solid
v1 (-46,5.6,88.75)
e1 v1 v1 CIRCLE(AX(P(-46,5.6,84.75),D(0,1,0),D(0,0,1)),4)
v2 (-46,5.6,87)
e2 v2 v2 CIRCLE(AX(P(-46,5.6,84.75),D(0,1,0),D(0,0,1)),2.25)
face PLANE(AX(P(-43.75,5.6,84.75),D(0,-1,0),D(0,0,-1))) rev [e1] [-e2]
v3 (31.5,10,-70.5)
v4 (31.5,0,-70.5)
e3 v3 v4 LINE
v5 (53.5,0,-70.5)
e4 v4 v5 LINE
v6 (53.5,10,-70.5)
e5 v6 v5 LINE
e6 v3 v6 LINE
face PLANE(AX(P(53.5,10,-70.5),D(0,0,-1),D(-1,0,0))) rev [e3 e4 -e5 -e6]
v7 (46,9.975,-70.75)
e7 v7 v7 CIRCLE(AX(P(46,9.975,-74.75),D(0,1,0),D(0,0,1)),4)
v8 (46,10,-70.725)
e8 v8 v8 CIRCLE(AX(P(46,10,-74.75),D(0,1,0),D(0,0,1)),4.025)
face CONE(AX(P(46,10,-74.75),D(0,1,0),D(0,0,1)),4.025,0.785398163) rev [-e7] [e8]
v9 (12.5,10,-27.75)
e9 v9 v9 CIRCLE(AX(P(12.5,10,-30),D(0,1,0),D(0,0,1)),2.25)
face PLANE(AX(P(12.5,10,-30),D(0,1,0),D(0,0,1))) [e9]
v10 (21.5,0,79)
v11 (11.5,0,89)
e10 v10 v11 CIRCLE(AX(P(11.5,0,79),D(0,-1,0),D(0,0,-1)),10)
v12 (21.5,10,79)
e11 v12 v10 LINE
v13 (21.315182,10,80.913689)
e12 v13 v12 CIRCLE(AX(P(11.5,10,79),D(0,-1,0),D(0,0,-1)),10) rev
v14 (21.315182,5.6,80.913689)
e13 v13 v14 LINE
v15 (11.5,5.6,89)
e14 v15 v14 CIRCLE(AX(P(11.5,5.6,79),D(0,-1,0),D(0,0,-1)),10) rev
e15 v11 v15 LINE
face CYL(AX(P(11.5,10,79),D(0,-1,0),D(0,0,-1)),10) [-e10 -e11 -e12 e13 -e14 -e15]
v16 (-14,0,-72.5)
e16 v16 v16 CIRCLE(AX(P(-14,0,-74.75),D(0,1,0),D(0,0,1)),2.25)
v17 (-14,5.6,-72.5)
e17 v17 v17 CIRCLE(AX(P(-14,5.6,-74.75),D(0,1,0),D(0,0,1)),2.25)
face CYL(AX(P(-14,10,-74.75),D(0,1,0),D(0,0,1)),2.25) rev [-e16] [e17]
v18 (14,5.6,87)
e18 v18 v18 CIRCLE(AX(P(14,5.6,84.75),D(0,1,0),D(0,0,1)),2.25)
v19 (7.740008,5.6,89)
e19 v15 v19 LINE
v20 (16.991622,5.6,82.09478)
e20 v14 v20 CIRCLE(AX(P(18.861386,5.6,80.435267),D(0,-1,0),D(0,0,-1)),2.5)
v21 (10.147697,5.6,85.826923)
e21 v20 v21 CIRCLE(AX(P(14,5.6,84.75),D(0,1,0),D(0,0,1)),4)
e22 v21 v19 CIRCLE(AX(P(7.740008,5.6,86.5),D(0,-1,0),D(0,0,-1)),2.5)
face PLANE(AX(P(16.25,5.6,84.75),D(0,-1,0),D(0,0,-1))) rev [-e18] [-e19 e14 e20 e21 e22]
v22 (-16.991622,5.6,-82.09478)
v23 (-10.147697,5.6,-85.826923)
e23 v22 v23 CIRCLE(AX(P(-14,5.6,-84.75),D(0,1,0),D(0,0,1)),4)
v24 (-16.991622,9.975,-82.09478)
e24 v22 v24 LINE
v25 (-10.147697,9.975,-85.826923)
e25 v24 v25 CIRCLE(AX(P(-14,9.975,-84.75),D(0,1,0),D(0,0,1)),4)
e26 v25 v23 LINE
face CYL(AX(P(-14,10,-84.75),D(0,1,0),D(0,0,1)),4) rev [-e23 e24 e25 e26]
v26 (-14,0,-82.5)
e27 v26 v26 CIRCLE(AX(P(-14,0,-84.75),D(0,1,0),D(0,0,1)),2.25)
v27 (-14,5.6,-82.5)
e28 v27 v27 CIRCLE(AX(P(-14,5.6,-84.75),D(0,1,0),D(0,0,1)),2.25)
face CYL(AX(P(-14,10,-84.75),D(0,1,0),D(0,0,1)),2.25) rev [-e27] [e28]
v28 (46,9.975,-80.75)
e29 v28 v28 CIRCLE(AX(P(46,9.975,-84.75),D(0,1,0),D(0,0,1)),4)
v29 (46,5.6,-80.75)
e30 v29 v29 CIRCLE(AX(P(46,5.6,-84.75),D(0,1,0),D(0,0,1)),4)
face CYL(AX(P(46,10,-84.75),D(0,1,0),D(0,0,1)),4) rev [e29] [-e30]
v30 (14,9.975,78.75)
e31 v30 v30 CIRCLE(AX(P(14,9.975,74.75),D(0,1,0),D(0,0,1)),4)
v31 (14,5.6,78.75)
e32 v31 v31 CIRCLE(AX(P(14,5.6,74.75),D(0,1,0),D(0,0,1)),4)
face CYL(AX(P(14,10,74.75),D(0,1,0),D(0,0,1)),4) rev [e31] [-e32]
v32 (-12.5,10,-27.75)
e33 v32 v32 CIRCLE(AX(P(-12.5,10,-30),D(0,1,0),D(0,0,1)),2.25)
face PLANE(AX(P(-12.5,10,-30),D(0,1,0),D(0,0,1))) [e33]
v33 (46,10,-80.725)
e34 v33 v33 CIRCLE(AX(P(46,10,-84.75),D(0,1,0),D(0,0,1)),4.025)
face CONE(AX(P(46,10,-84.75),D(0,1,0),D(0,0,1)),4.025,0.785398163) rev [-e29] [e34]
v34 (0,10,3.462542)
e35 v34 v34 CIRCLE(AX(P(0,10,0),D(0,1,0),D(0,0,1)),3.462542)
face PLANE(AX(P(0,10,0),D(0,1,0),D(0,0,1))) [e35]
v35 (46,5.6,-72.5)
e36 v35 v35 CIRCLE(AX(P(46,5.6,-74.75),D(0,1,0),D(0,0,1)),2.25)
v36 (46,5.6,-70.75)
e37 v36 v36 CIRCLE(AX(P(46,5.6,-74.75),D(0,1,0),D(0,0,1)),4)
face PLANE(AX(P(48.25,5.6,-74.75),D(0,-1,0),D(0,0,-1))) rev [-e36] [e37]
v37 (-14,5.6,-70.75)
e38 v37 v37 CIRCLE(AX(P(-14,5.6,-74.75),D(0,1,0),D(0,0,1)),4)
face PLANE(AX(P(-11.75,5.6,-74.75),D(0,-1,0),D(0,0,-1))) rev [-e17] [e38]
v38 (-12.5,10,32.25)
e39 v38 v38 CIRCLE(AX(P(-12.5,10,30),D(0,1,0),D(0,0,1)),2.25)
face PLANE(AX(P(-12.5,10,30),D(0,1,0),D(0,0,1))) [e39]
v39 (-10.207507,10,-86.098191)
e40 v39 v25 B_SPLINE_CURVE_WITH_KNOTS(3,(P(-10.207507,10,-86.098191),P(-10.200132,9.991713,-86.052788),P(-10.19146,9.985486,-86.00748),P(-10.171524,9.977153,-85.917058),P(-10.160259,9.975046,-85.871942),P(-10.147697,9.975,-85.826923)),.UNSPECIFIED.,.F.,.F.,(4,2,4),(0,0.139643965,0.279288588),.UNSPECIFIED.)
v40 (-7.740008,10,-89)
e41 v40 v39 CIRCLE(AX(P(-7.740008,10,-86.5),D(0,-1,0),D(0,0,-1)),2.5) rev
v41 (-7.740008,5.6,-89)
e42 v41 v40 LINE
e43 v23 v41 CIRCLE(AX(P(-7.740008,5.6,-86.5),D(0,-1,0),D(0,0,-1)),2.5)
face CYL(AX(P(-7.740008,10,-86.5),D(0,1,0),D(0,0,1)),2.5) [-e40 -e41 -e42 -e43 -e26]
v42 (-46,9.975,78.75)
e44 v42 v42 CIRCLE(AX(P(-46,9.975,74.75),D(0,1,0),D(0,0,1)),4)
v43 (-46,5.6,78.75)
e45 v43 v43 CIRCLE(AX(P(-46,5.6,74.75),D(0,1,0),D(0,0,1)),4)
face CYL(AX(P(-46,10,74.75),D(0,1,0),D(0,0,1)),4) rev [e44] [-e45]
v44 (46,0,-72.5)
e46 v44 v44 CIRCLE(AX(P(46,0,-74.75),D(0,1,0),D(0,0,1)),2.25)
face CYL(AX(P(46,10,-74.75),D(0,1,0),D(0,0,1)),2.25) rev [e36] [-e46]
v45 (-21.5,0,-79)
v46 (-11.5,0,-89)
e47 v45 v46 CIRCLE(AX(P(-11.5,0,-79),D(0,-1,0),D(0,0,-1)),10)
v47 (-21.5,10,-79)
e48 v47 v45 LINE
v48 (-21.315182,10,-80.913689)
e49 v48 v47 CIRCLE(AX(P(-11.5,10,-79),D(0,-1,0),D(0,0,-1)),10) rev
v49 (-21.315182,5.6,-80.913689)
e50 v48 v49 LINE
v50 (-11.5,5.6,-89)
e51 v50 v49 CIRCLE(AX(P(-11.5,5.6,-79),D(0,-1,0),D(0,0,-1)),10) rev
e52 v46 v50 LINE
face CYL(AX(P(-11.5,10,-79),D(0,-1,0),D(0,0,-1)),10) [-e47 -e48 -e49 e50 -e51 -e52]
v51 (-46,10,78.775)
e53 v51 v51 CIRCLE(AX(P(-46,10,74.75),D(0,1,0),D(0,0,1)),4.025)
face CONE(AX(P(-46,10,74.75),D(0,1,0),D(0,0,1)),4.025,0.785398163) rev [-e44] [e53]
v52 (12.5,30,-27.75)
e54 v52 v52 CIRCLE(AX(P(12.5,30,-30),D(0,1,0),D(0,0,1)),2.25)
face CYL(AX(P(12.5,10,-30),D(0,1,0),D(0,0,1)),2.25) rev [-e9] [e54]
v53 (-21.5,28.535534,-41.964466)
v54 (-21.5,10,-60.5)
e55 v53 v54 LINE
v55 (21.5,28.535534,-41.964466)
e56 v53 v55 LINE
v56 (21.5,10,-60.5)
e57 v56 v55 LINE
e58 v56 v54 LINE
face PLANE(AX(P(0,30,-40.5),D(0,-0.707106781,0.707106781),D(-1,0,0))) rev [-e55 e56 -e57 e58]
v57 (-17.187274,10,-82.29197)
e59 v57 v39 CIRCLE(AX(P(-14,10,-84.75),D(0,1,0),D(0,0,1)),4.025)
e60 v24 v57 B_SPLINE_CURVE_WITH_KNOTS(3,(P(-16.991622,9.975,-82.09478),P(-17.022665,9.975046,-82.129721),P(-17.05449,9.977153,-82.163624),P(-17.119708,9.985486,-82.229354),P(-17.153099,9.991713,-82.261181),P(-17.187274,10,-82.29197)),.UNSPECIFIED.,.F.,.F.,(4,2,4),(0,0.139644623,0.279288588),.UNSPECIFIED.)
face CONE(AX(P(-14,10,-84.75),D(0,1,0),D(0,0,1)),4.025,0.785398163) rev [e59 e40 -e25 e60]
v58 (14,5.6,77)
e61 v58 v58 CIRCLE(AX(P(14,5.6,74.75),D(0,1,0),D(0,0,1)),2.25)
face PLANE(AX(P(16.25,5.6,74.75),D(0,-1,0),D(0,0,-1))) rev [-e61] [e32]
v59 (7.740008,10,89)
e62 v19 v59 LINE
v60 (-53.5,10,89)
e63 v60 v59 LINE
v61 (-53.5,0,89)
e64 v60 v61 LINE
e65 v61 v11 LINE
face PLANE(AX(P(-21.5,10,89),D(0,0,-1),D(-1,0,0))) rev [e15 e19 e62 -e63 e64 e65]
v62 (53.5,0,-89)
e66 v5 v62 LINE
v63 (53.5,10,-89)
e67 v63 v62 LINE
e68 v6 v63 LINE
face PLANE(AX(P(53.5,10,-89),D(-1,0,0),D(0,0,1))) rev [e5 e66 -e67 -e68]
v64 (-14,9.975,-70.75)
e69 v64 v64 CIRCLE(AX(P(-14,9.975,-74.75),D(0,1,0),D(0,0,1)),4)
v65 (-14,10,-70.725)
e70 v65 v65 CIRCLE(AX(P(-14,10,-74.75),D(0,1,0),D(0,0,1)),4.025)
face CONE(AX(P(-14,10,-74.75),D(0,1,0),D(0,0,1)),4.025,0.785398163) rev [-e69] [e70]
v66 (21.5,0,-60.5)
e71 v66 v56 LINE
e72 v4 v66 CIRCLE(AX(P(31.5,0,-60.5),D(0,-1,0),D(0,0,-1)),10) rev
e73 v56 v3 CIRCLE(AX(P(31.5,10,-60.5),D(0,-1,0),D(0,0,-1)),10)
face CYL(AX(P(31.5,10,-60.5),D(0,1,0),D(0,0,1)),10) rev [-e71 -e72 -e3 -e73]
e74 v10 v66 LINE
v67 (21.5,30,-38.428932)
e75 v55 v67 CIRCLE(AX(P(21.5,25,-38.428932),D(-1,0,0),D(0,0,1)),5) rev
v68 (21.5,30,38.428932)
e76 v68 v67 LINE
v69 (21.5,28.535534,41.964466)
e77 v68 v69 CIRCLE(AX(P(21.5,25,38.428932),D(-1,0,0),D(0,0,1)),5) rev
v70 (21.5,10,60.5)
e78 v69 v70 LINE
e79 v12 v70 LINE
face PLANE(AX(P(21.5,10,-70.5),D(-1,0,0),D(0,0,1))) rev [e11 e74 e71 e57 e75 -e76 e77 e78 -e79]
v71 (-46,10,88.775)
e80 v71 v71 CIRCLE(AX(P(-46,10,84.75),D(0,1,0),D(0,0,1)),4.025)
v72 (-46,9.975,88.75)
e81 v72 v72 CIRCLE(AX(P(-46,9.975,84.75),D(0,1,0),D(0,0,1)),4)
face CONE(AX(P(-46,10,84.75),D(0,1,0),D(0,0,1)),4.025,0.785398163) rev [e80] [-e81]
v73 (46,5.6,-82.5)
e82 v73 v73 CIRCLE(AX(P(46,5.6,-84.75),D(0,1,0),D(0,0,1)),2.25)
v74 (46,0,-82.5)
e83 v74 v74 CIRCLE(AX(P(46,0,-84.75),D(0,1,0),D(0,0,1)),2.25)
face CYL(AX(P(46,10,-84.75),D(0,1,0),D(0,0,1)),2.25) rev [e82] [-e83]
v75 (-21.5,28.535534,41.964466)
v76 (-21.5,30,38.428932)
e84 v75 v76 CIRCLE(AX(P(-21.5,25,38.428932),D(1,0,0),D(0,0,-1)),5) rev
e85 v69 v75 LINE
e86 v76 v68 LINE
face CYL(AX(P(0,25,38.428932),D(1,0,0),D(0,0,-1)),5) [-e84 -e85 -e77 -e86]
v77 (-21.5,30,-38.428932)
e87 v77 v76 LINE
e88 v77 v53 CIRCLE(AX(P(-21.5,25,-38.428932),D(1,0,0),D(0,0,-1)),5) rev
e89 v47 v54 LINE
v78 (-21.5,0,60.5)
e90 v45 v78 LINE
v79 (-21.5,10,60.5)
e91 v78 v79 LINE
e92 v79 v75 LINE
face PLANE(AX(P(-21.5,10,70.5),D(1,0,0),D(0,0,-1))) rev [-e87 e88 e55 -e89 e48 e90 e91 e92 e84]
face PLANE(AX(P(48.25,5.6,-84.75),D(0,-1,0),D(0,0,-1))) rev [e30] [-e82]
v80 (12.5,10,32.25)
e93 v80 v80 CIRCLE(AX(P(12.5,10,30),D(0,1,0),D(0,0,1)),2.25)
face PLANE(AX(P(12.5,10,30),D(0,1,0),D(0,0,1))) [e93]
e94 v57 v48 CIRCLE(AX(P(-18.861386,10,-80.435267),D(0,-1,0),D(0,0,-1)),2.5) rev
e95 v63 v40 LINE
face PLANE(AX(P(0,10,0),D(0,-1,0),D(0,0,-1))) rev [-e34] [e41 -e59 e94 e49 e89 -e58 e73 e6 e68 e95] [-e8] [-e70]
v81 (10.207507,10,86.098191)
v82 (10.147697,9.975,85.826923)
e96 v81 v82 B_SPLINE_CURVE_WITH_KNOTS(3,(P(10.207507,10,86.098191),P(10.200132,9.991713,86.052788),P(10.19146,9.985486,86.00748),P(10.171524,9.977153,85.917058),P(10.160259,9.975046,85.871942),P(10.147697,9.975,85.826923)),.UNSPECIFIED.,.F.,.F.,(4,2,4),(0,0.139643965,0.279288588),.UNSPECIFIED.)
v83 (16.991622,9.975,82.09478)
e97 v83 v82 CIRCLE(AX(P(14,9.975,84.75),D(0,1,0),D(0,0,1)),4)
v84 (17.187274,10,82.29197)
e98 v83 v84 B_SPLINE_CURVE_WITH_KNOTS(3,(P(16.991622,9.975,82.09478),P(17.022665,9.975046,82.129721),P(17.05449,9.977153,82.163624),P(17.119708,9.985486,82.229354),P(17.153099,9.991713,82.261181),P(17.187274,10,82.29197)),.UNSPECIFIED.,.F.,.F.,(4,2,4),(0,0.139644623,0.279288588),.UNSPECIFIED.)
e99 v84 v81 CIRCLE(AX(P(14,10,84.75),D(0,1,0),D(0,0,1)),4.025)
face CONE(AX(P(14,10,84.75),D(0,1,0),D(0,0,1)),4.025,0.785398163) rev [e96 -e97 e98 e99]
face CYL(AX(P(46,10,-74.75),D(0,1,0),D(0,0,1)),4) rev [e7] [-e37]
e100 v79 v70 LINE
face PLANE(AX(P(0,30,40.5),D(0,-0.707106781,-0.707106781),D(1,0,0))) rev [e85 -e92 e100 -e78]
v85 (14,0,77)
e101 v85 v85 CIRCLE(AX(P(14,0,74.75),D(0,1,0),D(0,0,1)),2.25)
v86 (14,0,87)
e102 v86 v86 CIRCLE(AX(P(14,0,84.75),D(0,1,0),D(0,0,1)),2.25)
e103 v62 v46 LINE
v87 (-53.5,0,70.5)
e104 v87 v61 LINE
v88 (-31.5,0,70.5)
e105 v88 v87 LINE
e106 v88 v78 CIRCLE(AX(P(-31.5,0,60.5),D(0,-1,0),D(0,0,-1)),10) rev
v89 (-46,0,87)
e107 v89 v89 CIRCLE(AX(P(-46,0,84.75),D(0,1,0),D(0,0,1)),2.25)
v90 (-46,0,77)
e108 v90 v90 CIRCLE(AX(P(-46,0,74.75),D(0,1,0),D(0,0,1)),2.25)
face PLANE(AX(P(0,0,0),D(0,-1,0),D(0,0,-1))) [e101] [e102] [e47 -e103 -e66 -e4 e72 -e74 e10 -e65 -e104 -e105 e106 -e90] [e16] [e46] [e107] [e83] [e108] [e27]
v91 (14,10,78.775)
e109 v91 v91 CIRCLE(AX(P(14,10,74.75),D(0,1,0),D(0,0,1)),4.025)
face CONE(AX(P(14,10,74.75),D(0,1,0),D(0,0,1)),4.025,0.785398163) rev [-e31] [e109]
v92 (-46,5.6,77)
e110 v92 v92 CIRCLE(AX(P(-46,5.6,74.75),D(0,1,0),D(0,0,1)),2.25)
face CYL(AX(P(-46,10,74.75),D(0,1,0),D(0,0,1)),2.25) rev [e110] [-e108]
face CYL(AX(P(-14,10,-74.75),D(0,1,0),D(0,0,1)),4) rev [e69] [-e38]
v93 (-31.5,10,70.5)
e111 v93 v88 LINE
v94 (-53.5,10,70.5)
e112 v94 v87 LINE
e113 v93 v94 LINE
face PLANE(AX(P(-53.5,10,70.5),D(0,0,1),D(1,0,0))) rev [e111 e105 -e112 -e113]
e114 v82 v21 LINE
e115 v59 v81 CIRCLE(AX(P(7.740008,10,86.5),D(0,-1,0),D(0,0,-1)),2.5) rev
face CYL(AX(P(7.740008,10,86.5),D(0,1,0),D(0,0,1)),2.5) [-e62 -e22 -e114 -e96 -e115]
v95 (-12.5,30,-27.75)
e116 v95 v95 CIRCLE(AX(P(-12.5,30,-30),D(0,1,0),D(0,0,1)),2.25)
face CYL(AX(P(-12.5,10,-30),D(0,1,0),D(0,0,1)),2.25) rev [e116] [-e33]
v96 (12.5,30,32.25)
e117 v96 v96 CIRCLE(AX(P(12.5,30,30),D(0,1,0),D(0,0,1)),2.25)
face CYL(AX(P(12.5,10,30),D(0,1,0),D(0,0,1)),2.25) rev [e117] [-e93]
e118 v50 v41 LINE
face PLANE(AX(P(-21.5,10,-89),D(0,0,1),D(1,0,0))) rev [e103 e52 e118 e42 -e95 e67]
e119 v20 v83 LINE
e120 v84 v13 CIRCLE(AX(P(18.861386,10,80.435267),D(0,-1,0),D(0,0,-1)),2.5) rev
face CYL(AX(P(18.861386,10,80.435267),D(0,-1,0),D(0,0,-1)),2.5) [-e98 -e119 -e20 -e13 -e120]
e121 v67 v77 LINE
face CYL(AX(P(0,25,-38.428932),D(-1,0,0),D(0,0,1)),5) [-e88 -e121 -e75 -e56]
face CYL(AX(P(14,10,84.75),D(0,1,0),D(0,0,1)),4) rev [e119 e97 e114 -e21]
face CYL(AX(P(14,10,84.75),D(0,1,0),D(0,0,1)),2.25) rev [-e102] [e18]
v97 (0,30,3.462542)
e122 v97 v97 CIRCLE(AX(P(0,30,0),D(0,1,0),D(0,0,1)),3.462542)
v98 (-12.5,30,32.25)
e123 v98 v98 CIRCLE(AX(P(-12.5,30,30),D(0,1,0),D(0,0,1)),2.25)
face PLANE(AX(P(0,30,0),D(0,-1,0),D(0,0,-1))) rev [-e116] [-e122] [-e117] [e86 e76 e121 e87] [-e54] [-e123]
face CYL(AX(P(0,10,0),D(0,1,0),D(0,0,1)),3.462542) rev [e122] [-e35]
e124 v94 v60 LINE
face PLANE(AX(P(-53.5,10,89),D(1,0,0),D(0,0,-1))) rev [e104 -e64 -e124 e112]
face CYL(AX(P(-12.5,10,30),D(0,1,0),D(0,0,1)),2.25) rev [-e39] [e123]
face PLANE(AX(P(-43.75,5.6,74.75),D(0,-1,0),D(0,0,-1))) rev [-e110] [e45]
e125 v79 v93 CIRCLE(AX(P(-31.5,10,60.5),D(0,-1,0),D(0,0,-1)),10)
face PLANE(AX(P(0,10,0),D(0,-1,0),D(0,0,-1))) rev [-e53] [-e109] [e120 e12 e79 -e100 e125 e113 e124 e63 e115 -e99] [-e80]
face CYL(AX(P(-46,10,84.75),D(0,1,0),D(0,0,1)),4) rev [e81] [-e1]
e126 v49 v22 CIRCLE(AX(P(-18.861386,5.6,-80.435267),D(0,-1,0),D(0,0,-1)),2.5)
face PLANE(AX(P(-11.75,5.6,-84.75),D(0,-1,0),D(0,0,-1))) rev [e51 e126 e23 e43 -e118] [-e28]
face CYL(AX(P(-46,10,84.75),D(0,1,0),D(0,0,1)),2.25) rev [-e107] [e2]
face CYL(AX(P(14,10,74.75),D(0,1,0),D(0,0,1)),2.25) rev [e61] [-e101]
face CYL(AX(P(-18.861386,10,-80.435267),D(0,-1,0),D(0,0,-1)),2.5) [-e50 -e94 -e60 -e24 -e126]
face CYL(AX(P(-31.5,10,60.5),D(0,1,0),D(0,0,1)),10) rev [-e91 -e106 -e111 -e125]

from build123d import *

# Parameters (mm, degrees)
BOSS_EXTRUDE1_DEPTH                          = 10
FILLET1_R                                    = 10
SKETCH2_R                                    = 1.75
CUT_EXTRUDE1_DEPTH                           = 10
CBORE_FOR_M4_HEX_SOCKET_HEAD_CAP_SCR_2_COUNT = 2
CBORE_FOR_M4_HEX_SOCKET_HEAD_CAP_SCR_2_PITCH = 10
CBORE_FOR_M4_HEX_SOCKET_HEAD_CAP_SCR_3_COUNT = 2
CBORE_FOR_M4_HEX_SOCKET_HEAD_CAP_SCR_3_PITCH = 60
CBORE_FOR_M4_HEX_SOCKET_HEAD_CAP_SCR_4_COUNT = 2
CBORE_FOR_M4_HEX_SOCKET_HEAD_CAP_SCR_4_PITCH = 152.099474029
CBORE_FOR_M4_HEX_SOCKET_HEAD_CAP_SCR_5_COUNT = 2
CBORE_FOR_M4_HEX_SOCKET_HEAD_CAP_SCR_5_PITCH = 161.939031737
CBORE_FOR_M4_HEX_SOCKET_HEAD_CAP_SCR_6_COUNT = 2
CBORE_FOR_M4_HEX_SOCKET_HEAD_CAP_SCR_6_PITCH = 162.67836365
CBORE_FOR_M4_HEX_SOCKET_HEAD_CAP_SCR_7_COUNT = 2
CBORE_FOR_M4_HEX_SOCKET_HEAD_CAP_SCR_7_PITCH = 152.886395732
CBORE_FOR_M4_HEX_SOCKET_HEAD_CAP_SCR_8_COUNT = 2
CBORE_FOR_M4_HEX_SOCKET_HEAD_CAP_SCR_8_PITCH = 60.827625303
FILLET2_R                                    = 2.5
FILLET3_R                                    = 2.5
SKETCH5_W                                    = 43
SKETCH5_H                                    = 121
BOSS_EXTRUDE2_DEPTH                          = 20
CHAMFER1_SIZE                                = 20
SKETCH6_R                                    = 3.462541839
CUT_EXTRUDE2_DEPTH                           = 20
SKETCH7_R                                    = 2.25
CUT_EXTRUDE3_DEPTH                           = 20
FILLET4_R                                    = 5


# Some blends are built 0.0001 mm under size
with BuildPart() as part:
    # Sketch1 → Boss-Extrude1 (new body)
    with BuildSketch(Plane(origin=(0, 0, 0), x_dir=(1, 0, 0), z_dir=(0, 1, 0))):
        Polygon((-21.5, -89), (21.5, -89), (21.5, 70.5), (53.5, 70.5), (53.5, 89), (-21.5, 89), (-21.5, -70.5), (-53.5, -70.5), (-53.5, -89), align=None)
    extrude(amount=BOSS_EXTRUDE1_DEPTH)

    # Fillet1
    fillet1_edges = [part.edges().sort_by_distance(p)[0] for p in [
        (-21.5, 5, 70.5),
        (-21.5, 5, -89),
        (21.5, 5, -70.5),
        (21.5, 5, 89),
    ]]
    fillet(fillet1_edges, radius=FILLET1_R)

    # Sketch2 → Cut-Extrude1 (cut)
    with BuildSketch(Plane(origin=(0, 10, 0), x_dir=(1, 0, 0), z_dir=(0, 1, 0))):
        with Locations(Location((-14, 74.75, 0), (0, 0, 270))):
            Circle(SKETCH2_R)
        with Locations(Location((-14, 84.75, 0), (0, 0, 270))):
            Circle(SKETCH2_R)
        with Locations(Location((46, 74.75, 0), (0, 0, 270))):
            Circle(SKETCH2_R)
        with Locations(Location((46, 84.75, 0), (0, 0, 270))):
            Circle(SKETCH2_R)
        with Locations(Location((-46, -74.75, 0), (0, 0, 270))):
            Circle(SKETCH2_R)
        with Locations(Location((-46, -84.75, 0), (0, 0, 270))):
            Circle(SKETCH2_R)
        with Locations(Location((14, -74.75, 0), (0, 0, 270))):
            Circle(SKETCH2_R)
        with Locations(Location((14, -84.75, 0), (0, 0, 270))):
            Circle(SKETCH2_R)
    extrude(amount=-CUT_EXTRUDE1_DEPTH, mode=Mode.SUBTRACT)

    # Sketch4 → CBORE for M4 Hex Socket Head Cap Screw1 (revolve, cut)
    with BuildSketch(Plane(origin=(-14, 10, -74.75), x_dir=(0, 0, 1), z_dir=(1, 0, 0))):
        Polygon((0, 0), (0, 11.351936393), (2.25, 10), (2.25, 4.4), (4, 4.4), (4, 0.025), (4.025, 0), align=None)
    cbore_for_m4_hex_socket_head_cap_screw1 = revolve(axis=Axis((-14, 16.35, -74.75), (0, -1, 0)), mode=Mode.SUBTRACT)

    # CBORE for M4 Hex Socket Head Cap Scr 2: CBORE for M4 Hex Socket Head Cap Screw1 ×2
    with Locations(*[(0, 0, -i * CBORE_FOR_M4_HEX_SOCKET_HEAD_CAP_SCR_2_PITCH) for i in range(1, CBORE_FOR_M4_HEX_SOCKET_HEAD_CAP_SCR_2_COUNT)]):
        add(cbore_for_m4_hex_socket_head_cap_screw1, mode=Mode.SUBTRACT)

    # CBORE for M4 Hex Socket Head Cap Scr 3: CBORE for M4 Hex Socket Head Cap Screw1 ×2
    with Locations(*[(i * CBORE_FOR_M4_HEX_SOCKET_HEAD_CAP_SCR_3_PITCH, 0, 0) for i in range(1, CBORE_FOR_M4_HEX_SOCKET_HEAD_CAP_SCR_3_COUNT)]):
        add(cbore_for_m4_hex_socket_head_cap_screw1, mode=Mode.SUBTRACT)

    # CBORE for M4 Hex Socket Head Cap Scr 4: CBORE for M4 Hex Socket Head Cap Screw1 ×2
    with Locations(*[Vector(0.1840900514527529, 0, 0.9829093818639248) * (i * CBORE_FOR_M4_HEX_SOCKET_HEAD_CAP_SCR_4_PITCH) for i in range(1, CBORE_FOR_M4_HEX_SOCKET_HEAD_CAP_SCR_4_COUNT)]):
        add(cbore_for_m4_hex_socket_head_cap_screw1, mode=Mode.SUBTRACT)

    # CBORE for M4 Hex Socket Head Cap Scr 5: CBORE for M4 Hex Socket Head Cap Screw1 ×2
    with Locations(*[Vector(0.1729045783441913, 0, 0.9849385802107751) * (i * CBORE_FOR_M4_HEX_SOCKET_HEAD_CAP_SCR_5_PITCH) for i in range(1, CBORE_FOR_M4_HEX_SOCKET_HEAD_CAP_SCR_5_COUNT)]):
        add(cbore_for_m4_hex_socket_head_cap_screw1, mode=Mode.SUBTRACT)

    # CBORE for M4 Hex Socket Head Cap Scr 6: CBORE for M4 Hex Socket Head Cap Screw1 ×2
    with Locations(*[Vector(-0.19670716671795496, 0, 0.9804622841097942) * (i * CBORE_FOR_M4_HEX_SOCKET_HEAD_CAP_SCR_6_PITCH) for i in range(1, CBORE_FOR_M4_HEX_SOCKET_HEAD_CAP_SCR_6_COUNT)]):
        add(cbore_for_m4_hex_socket_head_cap_screw1, mode=Mode.SUBTRACT)

    # CBORE for M4 Hex Socket Head Cap Scr 7: CBORE for M4 Hex Socket Head Cap Screw1 ×2
    with Locations(*[Vector(-0.20930573872668637, 0, 0.9778502481137263) * (i * CBORE_FOR_M4_HEX_SOCKET_HEAD_CAP_SCR_7_PITCH) for i in range(1, CBORE_FOR_M4_HEX_SOCKET_HEAD_CAP_SCR_7_COUNT)]):
        add(cbore_for_m4_hex_socket_head_cap_screw1, mode=Mode.SUBTRACT)

    # CBORE for M4 Hex Socket Head Cap Scr 8: CBORE for M4 Hex Socket Head Cap Screw1 ×2
    with Locations(*[Vector(0.9863939238321426, 0, -0.1643989873053641) * (i * CBORE_FOR_M4_HEX_SOCKET_HEAD_CAP_SCR_8_PITCH) for i in range(1, CBORE_FOR_M4_HEX_SOCKET_HEAD_CAP_SCR_8_COUNT)]):
        add(cbore_for_m4_hex_socket_head_cap_screw1, mode=Mode.SUBTRACT)

    # Fillet2
    # the kernel refuses this fillet: 2.5 mm, written as the material it takes off along each edge
    with BuildSketch(Plane(origin=(-13.754801439, 5.6, -88.742477635), x_dir=(0.9990847033117879, 0, -0.042775642699985884), z_dir=(0, 1, 0))) as fillet2_piece_1:
        with BuildLine():
            CenterArc((5.91336471, -2.497711758), FILLET2_R, 87.548388178, 105.618498276)
            Line((3.479087926, -3.067182162), (3.235660248, -3.124129202))
            ThreePointArc((3.235660248, -3.124129202), (2.064143441, -1.165399671), (-0.025984683, -0.248645925))
            Line((-0.025984683, -0.248645925), (-0.045899922, 0.245750274))
            ThreePointArc((-0.045899922, 0.245750274), (2.274447223, 0.410607251), (6.030997727, 0.249771176))
            Line((6.030997727, 0.249771176), (6.020303816, 0))
        make_face()
    extrude(amount=19.425759541, mode=Mode.SUBTRACT)
    with BuildSketch(Plane(origin=(-17.087010961, 5.6, -87.293690886), x_dir=(-0.5524220177087732, 0, 0.8335645831911094), z_dir=(0, 1, 0))) as fillet2_piece_2:
        with BuildLine():
            CenterArc((6.697143458, 2.309687979), FILLET2_R, 165.124054411, 127.376595494)
            ThreePointArc((4.280933593, 2.951505625), (2.685480046, 0.685252699), (0, 0))
            ThreePointArc((0, 0), (3.826939119, -0.761248083), (7.653878238, 0))
        make_face()
    extrude(amount=23.509695594, mode=Mode.SUBTRACT)

    # Fillet3
    # the kernel refuses this fillet: 2.5 mm, written as the material it takes off along each edge
    with BuildSketch(Plane(origin=(13.75480144, 5.6, 88.742477635), x_dir=(-0.7777172566996915, 0, -0.6286142446934416), z_dir=(0, 1, 0))) as fillet3_piece_1:
        with BuildLine():
            CenterArc((6.087462048, 2.036971289), FILLET3_R, 128.947957862, 105.618498276)
            Line((4.515926436, 3.98126443), (4.358772875, 4.175693744))
            ThreePointArc((4.358772875, 4.175693744), (1.434562202, 1.812109205), (-0.196946455, 0.153987317))
            Line((-0.196946455, 0.153987317), (0.144939573, -0.203697129))
            ThreePointArc((0.144939573, -0.203697129), (2.319033161, 0.490845938), (4.49312675, -0.203697129))
            Line((4.49312675, -0.203697129), (4.638066322, 0))
        make_face()
    extrude(amount=19.425759541, mode=Mode.SUBTRACT)
    with BuildSketch(Plane(origin=(17.087010961, 5.6, 87.293690886), x_dir=(-0.018344711955799436, 0, -0.9998317216128216), z_dir=(0, 1, 0))) as fillet3_piece_2:
        with BuildLine():
            CenterArc((6.824719559, -1.89989263), FILLET3_R, 130.539588182, 127.376595494)
            ThreePointArc((6.30136363, -4.344498645), (2.718581752, -2.798977477), (0, 0))
            ThreePointArc((0, 0), (2.599893165, -0.960171793), (5.19978633, 0))
        make_face()
    extrude(amount=23.509695594, mode=Mode.SUBTRACT)

    # Sketch5 → Boss-Extrude2 (add)
    with BuildSketch(Plane(origin=(0, 10, 0), x_dir=(1, 0, 0), z_dir=(0, 1, 0))):
        Rectangle(SKETCH5_W, SKETCH5_H)
    extrude(amount=BOSS_EXTRUDE2_DEPTH)

    # Chamfer1
    chamfer1_edges = [part.edges().sort_by_distance(p)[0] for p in [
        (0, 30, -60.5),
        (0, 30, 60.5),
    ]]
    chamfer(chamfer1_edges, length=CHAMFER1_SIZE - 0.0001)  # a hair under: the kernel refuses the full size

    # Sketch6 → Cut-Extrude2 (cut)
    with BuildSketch(Plane(origin=(0, 30, 0), x_dir=(1, 0, 0), z_dir=(0, 1, 0))):
        with Locations(Location((0, 0, 0), (0, 0, 270))):
            Circle(SKETCH6_R)
    extrude(amount=-CUT_EXTRUDE2_DEPTH, mode=Mode.SUBTRACT)

    # Sketch7 → Cut-Extrude3 (cut)
    with BuildSketch(Plane(origin=(0, 30, 0), x_dir=(1, 0, 0), z_dir=(0, 1, 0))):
        with Locations(Location((-12.5, 30, 0), (0, 0, 270))):
            Circle(SKETCH7_R)
        with Locations(Location((12.5, 30, 0), (0, 0, 270))):
            Circle(SKETCH7_R)
        with Locations(Location((12.5, -30, 0), (0, 0, 270))):
            Circle(SKETCH7_R)
        with Locations(Location((-12.5, -30, 0), (0, 0, 270))):
            Circle(SKETCH7_R)
    extrude(amount=-CUT_EXTRUDE3_DEPTH, mode=Mode.SUBTRACT)

    # Fillet4
    fillet4_edges = [part.edges().sort_by_distance(p)[0] for p in [
        (0, 30, 40.5001),
        (0, 30, -40.5001),
    ]]
    fillet(fillet4_edges, radius=FILLET4_R)


solid = part.part
